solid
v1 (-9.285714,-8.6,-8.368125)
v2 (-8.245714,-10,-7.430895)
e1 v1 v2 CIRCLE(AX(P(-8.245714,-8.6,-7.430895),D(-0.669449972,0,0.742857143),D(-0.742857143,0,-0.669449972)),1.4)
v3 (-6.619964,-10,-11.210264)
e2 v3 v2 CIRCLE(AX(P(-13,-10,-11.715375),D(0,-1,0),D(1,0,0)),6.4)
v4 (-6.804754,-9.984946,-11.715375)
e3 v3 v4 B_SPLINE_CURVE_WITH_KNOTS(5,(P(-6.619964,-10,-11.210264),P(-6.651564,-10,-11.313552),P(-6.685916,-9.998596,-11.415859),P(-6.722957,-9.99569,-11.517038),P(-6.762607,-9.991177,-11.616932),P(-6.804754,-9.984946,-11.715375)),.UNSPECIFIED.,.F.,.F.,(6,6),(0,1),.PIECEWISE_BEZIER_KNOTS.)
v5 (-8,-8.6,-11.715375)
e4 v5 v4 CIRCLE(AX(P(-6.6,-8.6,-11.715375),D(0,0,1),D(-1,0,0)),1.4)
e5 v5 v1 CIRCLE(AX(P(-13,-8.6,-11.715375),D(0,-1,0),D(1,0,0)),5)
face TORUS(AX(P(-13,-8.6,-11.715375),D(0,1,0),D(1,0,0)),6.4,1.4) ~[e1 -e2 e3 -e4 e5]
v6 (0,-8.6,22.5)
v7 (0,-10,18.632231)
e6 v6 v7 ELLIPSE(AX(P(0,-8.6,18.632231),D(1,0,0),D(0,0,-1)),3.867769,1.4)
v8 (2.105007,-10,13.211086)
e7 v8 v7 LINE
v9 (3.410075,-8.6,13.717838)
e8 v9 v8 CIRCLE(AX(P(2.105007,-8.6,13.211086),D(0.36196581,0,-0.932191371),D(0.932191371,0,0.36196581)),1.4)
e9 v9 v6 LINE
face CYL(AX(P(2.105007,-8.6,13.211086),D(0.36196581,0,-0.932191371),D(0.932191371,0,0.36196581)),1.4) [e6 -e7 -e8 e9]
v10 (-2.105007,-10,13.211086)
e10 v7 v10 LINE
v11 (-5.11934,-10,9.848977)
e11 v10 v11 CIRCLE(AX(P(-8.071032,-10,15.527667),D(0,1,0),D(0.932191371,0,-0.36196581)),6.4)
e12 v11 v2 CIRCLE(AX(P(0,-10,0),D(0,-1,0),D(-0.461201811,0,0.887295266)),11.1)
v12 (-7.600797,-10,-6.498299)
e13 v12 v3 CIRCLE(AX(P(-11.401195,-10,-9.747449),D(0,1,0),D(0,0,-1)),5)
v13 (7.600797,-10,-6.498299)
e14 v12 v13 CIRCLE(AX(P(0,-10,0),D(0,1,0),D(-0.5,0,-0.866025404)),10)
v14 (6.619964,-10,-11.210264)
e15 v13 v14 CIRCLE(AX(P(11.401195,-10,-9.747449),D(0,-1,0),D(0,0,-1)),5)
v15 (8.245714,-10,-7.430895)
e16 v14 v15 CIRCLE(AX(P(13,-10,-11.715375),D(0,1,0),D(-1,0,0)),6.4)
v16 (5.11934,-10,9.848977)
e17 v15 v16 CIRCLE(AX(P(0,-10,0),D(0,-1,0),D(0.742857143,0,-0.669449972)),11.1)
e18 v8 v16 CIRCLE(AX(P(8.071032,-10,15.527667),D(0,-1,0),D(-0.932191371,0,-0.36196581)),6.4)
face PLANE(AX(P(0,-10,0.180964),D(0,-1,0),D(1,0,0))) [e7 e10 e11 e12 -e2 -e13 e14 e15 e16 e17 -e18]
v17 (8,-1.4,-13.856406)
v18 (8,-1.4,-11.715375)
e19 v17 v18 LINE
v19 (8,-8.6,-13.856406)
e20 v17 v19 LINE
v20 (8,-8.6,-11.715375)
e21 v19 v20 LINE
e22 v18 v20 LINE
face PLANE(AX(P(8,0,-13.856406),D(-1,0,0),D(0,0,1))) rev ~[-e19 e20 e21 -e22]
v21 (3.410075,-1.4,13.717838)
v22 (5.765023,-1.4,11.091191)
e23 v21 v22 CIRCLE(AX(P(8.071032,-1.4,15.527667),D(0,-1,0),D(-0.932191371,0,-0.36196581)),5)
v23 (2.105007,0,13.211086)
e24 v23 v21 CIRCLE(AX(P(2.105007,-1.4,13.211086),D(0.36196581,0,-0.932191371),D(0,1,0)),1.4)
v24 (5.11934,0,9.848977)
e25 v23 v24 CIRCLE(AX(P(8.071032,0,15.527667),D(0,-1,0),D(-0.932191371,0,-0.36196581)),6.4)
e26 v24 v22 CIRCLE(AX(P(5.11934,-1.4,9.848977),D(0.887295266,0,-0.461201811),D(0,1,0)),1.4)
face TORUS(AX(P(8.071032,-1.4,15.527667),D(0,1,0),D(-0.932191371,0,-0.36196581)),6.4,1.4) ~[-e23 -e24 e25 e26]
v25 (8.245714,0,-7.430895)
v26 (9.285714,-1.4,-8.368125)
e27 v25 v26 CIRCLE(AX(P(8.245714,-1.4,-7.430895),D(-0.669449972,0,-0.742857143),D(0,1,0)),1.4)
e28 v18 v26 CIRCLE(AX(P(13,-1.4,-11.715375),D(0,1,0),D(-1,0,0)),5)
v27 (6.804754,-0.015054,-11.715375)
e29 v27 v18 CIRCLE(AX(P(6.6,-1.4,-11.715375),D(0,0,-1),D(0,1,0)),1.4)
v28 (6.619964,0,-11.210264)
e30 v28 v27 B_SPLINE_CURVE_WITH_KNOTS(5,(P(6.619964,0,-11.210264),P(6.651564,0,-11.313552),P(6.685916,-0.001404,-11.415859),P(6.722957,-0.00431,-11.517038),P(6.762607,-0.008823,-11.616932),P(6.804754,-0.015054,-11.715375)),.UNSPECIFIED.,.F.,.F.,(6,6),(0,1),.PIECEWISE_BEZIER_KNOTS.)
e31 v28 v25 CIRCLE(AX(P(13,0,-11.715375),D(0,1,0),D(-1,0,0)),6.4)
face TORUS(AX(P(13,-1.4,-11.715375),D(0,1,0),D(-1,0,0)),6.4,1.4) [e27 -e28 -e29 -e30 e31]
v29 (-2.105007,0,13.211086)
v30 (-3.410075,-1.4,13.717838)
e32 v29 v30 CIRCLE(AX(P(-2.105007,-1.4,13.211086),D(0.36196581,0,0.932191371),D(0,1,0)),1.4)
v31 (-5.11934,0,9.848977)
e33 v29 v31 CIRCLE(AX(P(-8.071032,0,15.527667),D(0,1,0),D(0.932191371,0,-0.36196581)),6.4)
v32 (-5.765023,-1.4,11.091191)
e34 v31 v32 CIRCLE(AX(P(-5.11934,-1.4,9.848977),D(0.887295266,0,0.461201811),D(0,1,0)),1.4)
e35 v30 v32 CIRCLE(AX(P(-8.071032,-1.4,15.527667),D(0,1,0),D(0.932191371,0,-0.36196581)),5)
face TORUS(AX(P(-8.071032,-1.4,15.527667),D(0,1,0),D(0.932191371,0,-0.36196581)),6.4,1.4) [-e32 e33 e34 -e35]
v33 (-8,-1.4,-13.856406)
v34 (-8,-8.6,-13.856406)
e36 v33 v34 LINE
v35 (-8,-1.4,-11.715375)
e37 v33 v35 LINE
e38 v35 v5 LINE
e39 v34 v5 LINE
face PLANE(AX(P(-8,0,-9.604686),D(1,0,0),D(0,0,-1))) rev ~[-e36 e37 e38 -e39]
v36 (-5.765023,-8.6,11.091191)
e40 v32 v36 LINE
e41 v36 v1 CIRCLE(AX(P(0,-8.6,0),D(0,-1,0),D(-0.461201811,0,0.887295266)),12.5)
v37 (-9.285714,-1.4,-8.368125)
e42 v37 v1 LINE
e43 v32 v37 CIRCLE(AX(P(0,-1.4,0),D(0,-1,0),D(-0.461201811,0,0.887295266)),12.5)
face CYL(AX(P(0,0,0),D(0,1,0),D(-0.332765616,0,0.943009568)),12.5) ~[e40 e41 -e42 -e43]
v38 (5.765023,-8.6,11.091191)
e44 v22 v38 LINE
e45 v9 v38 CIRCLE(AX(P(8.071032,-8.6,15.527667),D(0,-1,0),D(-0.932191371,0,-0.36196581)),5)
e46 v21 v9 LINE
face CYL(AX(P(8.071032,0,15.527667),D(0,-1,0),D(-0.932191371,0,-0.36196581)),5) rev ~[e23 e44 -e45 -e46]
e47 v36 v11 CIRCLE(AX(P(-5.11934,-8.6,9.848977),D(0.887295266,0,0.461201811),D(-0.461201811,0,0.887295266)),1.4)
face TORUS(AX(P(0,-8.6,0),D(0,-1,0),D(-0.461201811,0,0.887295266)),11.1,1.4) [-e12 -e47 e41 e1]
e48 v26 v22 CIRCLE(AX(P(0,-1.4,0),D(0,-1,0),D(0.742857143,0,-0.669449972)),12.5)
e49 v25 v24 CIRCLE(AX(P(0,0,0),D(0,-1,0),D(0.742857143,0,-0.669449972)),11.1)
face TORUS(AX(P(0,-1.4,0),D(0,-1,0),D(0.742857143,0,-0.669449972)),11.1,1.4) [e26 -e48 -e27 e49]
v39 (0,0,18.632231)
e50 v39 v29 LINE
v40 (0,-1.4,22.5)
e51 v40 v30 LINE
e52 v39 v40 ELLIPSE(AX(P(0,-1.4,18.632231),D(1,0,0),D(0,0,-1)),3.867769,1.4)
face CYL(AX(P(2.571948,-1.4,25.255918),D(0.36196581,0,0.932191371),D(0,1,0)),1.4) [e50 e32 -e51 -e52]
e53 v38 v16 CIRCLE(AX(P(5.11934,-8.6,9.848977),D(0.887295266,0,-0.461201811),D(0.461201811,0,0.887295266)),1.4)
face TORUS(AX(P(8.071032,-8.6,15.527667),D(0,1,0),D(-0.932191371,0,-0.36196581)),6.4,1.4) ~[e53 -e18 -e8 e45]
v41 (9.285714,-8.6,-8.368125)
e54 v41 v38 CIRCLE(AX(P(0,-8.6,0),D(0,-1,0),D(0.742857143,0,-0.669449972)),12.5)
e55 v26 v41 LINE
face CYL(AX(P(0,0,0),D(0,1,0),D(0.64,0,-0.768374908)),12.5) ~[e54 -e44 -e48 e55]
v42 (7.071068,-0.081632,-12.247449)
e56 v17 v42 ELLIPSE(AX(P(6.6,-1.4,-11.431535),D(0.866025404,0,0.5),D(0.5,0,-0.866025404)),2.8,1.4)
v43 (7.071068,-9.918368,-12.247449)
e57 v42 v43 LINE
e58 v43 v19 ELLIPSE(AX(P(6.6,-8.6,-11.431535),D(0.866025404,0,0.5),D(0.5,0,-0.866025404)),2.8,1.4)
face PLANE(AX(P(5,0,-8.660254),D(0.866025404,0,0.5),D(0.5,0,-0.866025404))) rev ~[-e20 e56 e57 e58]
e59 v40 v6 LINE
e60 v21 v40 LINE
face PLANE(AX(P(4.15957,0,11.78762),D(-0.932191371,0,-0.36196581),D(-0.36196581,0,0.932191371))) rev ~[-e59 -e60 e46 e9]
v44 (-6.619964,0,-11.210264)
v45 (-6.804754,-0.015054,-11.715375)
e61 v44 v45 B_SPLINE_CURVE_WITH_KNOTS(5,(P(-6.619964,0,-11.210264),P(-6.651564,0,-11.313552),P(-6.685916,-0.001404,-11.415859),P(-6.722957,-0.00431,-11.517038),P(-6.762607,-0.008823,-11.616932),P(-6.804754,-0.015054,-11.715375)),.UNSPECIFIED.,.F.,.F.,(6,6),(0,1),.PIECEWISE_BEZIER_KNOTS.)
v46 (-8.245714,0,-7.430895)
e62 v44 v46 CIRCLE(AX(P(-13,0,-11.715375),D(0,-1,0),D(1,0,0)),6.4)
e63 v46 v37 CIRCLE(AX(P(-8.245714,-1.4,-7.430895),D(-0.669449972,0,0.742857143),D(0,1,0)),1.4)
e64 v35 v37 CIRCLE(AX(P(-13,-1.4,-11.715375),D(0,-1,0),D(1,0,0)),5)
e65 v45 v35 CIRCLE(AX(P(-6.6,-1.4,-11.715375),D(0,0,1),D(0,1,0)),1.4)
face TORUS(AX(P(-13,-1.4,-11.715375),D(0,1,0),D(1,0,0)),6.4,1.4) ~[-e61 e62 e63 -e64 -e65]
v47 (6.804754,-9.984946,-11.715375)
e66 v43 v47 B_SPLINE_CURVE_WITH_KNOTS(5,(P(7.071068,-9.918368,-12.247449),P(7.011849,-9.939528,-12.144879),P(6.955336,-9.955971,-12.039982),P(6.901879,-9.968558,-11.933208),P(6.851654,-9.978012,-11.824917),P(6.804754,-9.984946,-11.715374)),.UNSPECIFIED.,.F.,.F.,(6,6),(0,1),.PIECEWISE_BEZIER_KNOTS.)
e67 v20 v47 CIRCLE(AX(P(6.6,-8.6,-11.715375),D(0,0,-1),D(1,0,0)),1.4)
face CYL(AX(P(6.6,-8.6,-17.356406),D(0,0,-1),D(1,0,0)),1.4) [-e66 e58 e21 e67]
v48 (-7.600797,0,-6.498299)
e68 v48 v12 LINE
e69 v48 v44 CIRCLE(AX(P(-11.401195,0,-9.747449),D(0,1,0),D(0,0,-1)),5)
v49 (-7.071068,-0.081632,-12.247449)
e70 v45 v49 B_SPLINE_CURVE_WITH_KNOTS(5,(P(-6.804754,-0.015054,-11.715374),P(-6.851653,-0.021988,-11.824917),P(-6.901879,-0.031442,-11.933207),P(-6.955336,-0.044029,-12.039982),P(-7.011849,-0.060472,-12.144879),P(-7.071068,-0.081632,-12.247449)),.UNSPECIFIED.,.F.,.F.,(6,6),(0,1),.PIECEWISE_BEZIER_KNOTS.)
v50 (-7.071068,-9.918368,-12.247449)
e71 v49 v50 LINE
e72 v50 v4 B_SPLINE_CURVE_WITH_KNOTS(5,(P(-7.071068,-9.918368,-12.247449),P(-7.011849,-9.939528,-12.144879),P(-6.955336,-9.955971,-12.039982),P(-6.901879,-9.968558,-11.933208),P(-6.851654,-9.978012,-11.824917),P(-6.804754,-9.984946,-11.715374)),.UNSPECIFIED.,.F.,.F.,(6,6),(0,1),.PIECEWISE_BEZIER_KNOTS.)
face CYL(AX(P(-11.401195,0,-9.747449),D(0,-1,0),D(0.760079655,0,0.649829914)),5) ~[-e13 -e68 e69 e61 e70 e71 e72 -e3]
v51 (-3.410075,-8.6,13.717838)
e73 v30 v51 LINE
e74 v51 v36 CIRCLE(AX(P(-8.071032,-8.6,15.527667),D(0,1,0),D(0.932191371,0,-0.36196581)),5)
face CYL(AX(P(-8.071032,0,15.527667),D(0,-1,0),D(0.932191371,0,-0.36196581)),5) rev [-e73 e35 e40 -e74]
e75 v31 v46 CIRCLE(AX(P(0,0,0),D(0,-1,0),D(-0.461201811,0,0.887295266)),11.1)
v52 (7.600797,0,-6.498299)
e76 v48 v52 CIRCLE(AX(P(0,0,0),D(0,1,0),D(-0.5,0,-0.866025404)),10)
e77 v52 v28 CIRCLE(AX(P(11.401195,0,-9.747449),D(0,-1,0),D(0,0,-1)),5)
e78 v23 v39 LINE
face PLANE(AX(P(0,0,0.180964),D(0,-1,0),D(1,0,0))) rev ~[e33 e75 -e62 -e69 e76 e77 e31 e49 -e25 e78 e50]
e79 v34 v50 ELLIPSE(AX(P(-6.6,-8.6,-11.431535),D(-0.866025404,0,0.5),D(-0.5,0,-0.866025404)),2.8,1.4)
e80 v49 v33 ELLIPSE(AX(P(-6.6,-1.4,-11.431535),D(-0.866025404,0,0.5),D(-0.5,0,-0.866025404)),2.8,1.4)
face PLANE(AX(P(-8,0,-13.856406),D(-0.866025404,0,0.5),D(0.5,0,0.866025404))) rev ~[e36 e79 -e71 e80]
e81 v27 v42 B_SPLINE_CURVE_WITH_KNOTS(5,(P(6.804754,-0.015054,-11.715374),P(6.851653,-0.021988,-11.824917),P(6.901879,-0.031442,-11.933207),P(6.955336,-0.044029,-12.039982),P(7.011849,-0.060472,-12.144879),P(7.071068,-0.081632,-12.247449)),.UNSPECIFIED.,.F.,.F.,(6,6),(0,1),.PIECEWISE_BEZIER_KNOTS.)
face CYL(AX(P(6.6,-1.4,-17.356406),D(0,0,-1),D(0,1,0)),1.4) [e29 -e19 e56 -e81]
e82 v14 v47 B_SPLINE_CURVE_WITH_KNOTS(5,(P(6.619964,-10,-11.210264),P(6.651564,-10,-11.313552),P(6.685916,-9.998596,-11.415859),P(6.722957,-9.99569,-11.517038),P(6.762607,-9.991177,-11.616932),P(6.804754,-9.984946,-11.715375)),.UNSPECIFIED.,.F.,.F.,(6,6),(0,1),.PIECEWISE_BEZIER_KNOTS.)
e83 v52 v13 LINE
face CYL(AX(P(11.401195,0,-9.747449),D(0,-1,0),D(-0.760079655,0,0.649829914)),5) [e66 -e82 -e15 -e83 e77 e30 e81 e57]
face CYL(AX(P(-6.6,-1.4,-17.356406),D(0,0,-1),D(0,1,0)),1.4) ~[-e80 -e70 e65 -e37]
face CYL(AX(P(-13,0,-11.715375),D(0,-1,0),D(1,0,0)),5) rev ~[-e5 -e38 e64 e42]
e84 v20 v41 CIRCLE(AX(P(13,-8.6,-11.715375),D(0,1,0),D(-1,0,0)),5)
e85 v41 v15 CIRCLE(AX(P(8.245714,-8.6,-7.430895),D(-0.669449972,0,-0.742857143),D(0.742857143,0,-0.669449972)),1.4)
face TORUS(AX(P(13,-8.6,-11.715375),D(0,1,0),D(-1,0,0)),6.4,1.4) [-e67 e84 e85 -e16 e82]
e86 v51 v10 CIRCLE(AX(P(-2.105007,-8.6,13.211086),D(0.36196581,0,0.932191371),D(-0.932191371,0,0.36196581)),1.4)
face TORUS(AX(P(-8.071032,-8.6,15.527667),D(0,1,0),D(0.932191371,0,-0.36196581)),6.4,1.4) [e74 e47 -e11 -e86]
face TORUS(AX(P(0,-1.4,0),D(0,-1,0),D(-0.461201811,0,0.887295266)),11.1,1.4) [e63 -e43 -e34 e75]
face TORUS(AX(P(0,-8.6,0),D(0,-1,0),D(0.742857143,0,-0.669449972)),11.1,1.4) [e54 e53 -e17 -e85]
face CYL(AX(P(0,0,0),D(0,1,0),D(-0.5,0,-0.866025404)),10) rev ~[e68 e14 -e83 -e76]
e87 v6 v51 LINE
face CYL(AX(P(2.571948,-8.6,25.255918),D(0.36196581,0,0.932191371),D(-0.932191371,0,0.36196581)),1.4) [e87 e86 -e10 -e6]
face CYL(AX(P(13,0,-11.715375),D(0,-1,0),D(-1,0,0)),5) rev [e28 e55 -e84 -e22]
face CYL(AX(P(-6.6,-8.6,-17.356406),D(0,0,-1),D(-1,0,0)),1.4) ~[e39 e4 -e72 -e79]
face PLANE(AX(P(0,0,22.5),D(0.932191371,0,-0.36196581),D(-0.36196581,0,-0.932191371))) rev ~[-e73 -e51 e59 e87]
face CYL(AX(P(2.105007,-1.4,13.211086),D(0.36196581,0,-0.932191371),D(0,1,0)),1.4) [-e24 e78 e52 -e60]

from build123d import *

# Parameters (mm, degrees)
F1_DEPTH     = 10
F2_R         = 5
F3_R         = 5
F4_R         = 5
F5_R         = 5
F6_R         = 5
F7_T1_DEPTH  = 12.9209860369
F7_T3_DEPTH  = 12.9209860369
F7_T5_DEPTH  = 5.6410319467
F7_T8_ANGLE  = 41.3143422779
F7_T10_ANGLE = 104.5599421702
F7_T12_ANGLE = 42.0246275794
F7_T14_ANGLE = 41.3143422779
F7_T16_ANGLE = 104.5599421702
F7_T18_ANGLE = 42.0246275794
F8_T1_DEPTH  = 12.9209860369
F8_T3_DEPTH  = 12.9209860369
F8_T5_DEPTH  = 5.6410319467
F8_T8_ANGLE  = 42.0246275794
F8_T10_ANGLE = 42.0246275794
F8_T12_ANGLE = 104.5599421702
F8_T14_ANGLE = 104.5599421702
F8_T16_ANGLE = 41.3143422779
F8_T18_ANGLE = 41.3143422779


# Not quite as in the source:
# - a fillet or chamfer that OpenCascade refuses, or shapes differently, is made with other operations: its cross-section is extruded or revolved along the edge and cut away or added


with BuildPart() as f1:
    # F0 (on Front) → F1 (new body)
    with BuildSketch(Plane.XZ):
        with BuildLine():
            ThreePointArc((-5, -8.6602540378), (0, 10), (5, -8.6602540378))
            Line((5, -8.6602540378), (6.25, -10.8253175473))
            Line((6.25, -10.8253175473), (8, -13.8564064606))
            Line((8, -13.8564064606), (8, -9.6046863561))
            ThreePointArc((8, -9.6046863561), (12.3033115605, 2.2087382474), (4.1595701998, 11.7876195965))
            ThreePointArc((4.1595701998, 11.7876195965), (0, 12.5), (-4.1595701998, 11.7876195965))
            ThreePointArc((-4.1595701998, 11.7876195965), (-12.3033115605, 2.2087382474), (-8, -9.6046863561))
            Line((-8, -9.6046863561), (-8, -13.8564064606))
            Line((-8, -13.8564064606), (-6.25, -10.8253175473))
            Line((-6.25, -10.8253175473), (-5, -8.6602540378))
        make_face()
        with BuildLine():
            ThreePointArc((-4.1595701998, 11.7876195965), (0, 12.5), (4.1595701998, 11.7876195965))
            Line((4.1595701998, 11.7876195965), (0, 22.5))
            Line((0, 22.5), (-4.1595701998, 11.7876195965))
        make_face()
    extrude(amount=F1_DEPTH)

    # F2
    f2_edges = [f1.edges().sort_by_distance(p)[0] for p in [
        (-4.15957, -5, 11.78762),
    ]]
    fillet(f2_edges, radius=F2_R)

    # F3
    f3_edges = [f1.edges().sort_by_distance(p)[0] for p in [
        (4.15957, -5, 11.78762),
    ]]
    fillet(f3_edges, radius=F3_R)

    # F4
    f4_edges = [f1.edges().sort_by_distance(p)[0] for p in [
        (-5, -5, -8.660254),
    ]]
    fillet(f4_edges, radius=F4_R)

    # F5
    f5_edges = [f1.edges().sort_by_distance(p)[0] for p in [
        (-8, -5, -9.604686),
    ]]
    fillet(f5_edges, radius=F5_R)

    # F6
    f6_edges = [f1.edges().sort_by_distance(p)[0] for p in [
        (8, -5, -9.604686),
        (5, -5, -8.660254),
    ]]
    fillet(f6_edges, radius=F6_R)

    # F7: fillet of radius 1.4 on 2 edges, made by hand

    # F7_s2 → F7_t1 (cut)
    with BuildSketch(Plane(origin=(-4.1819067631, 0, 10.7699050398), x_dir=(0, 1, 0), z_dir=(-0.3619658098, 0, 0.9321913712))):
        with BuildLine():
            ThreePointArc((-8.6, -8.1442307215), (-9.5899494937, -7.7341802151), (-10, -6.7442307215))
            Line((-10, -6.7442307215), (-10, -8.1442307215))
            Line((-10, -8.1442307215), (-8.6, -8.1442307215))
        make_face()
    extrude(amount=F7_T1_DEPTH, mode=Mode.SUBTRACT)

    # F7_s4 → F7_t3 (cut)
    with BuildSketch(Plane(origin=(8.8588619379, 0, 22.8147367305), x_dir=(0, 1, 0), z_dir=(-0.3619658098, 0, -0.9321913712))):
        with BuildLine():
            ThreePointArc((-8.6, -8.1442307215), (-9.5899494937, -7.7341802151), (-10, -6.7442307215))
            Line((-10, -6.7442307215), (-10, -8.1442307215))
            Line((-10, -8.1442307215), (-8.6, -8.1442307215))
        make_face()
    extrude(amount=F7_T3_DEPTH, mode=Mode.SUBTRACT)

    # F7_s6 → F7_t5 (cut)
    with BuildSketch(Plane.XY.offset(-17.3564064606)):
        with BuildLine():
            ThreePointArc((-8, -8.6), (-7.5899494937, -9.5899494937), (-6.6, -10))
            Line((-6.6, -10), (-8, -10))
            Line((-8, -10), (-8, -8.6))
        make_face()
        with BuildLine():
            ThreePointArc((8, -8.6), (7.5899494937, -9.5899494937), (6.6, -10))
            Line((6.6, -10), (8, -10))
            Line((8, -10), (8, -8.6))
        make_face()
    extrude(amount=F7_T5_DEPTH, mode=Mode.SUBTRACT)

    # F7_s7 → F7_t8 (revolve, cut)
    with BuildSketch(Plane(origin=(4.1819067631, 0, 10.7699050398), x_dir=(0, 1, 0), z_dir=(0.3619658098, 0, 0.9321913712))):
        with BuildLine():
            ThreePointArc((-8.6, 8.1442307215), (-9.5899494937, 7.7341802151), (-10, 6.7442307215))
            Line((-10, 6.7442307215), (-10, 8.1442307215))
            Line((-10, 8.1442307215), (-8.6, 8.1442307215))
        make_face()
    revolve(axis=Axis((-8.0710316963, -10, 15.5276671576), (0, 1, 0)), revolution_arc=F7_T8_ANGLE, mode=Mode.SUBTRACT)

    # F7_s9 → F7_t10 (revolve, cut)
    with BuildSketch(Plane(origin=(0, 0, 0), x_dir=(0, 1, 0), z_dir=(0.8872952661, 0, 0.4612018112))):
        with BuildLine():
            ThreePointArc((-8.6, 12.5), (-9.5899494937, 12.0899494937), (-10, 11.1))
            Line((-10, 11.1), (-10, 12.5))
            Line((-10, 12.5), (-8.6, 12.5))
        make_face()
    revolve(axis=Axis((0, -10, 0), (0, -1, 0)), revolution_arc=F7_T10_ANGLE, mode=Mode.SUBTRACT)

    # F7_s11 → F7_t12 (revolve, cut)
    with BuildSketch(Plane.XY.offset(-11.7153745139)):
        with BuildLine():
            ThreePointArc((-8, -8.6), (-7.5899494937, -9.5899494937), (-6.6, -10))
            Line((-6.6, -10), (-8, -10))
            Line((-8, -10), (-8, -8.6))
        make_face()
    revolve(axis=Axis((-13, -10, -11.7153745139), (0, -1, 0)), revolution_arc=F7_T12_ANGLE, mode=Mode.SUBTRACT)

    # F7_s13 → F7_t14 (revolve, cut)
    with BuildSketch(Plane(origin=(-4.1819067631, 0, 10.7699050398), x_dir=(0, 1, 0), z_dir=(-0.3619658098, 0, 0.9321913712))):
        with BuildLine():
            ThreePointArc((-8.6, -8.1442307215), (-9.5899494937, -7.7341802151), (-10, -6.7442307215))
            Line((-10, -6.7442307215), (-10, -8.1442307215))
            Line((-10, -8.1442307215), (-8.6, -8.1442307215))
        make_face()
    revolve(axis=Axis((8.0710316963, -10, 15.5276671576), (0, -1, 0)), revolution_arc=F7_T14_ANGLE, mode=Mode.SUBTRACT)

    # F7_s15 → F7_t16 (revolve, cut)
    with BuildSketch(Plane(origin=(0, 0, 0), x_dir=(0, 1, 0), z_dir=(-0.6694499722, 0, -0.7428571429))):
        with BuildLine():
            ThreePointArc((-8.6, 12.5), (-9.5899494937, 12.0899494937), (-10, 11.1))
            Line((-10, 11.1), (-10, 12.5))
            Line((-10, 12.5), (-8.6, 12.5))
        make_face()
    revolve(axis=Axis((0, -10, 0), (0, -1, 0)), revolution_arc=F7_T16_ANGLE, mode=Mode.SUBTRACT)

    # F7_s17 → F7_t18 (revolve, cut)
    with BuildSketch(Plane.XY.offset(-11.7153745139)):
        with BuildLine():
            ThreePointArc((8, -8.6), (7.5899494937, -9.5899494937), (6.6, -10))
            Line((6.6, -10), (8, -10))
            Line((8, -10), (8, -8.6))
        make_face()
    revolve(axis=Axis((13, -10, -11.7153745139), (0, 1, 0)), revolution_arc=F7_T18_ANGLE, mode=Mode.SUBTRACT)

    # F8: fillet of radius 1.4 on 8 edges, made by hand

    # F8_s2 → F8_t1 (cut)
    with BuildSketch(Plane(origin=(-4.1819067631, 0, 10.7699050398), x_dir=(0, 1, 0), z_dir=(-0.3619658098, 0, 0.9321913712))):
        with BuildLine():
            ThreePointArc((0, -6.7442307215), (-0.4100505063, -7.7341802151), (-1.4, -8.1442307215))
            Line((-1.4, -8.1442307215), (0, -8.1442307215))
            Line((0, -8.1442307215), (0, -6.7442307215))
        make_face()
    extrude(amount=F8_T1_DEPTH, mode=Mode.SUBTRACT)

    # F8_s4 → F8_t3 (cut)
    with BuildSketch(Plane(origin=(8.8588619379, 0, 22.8147367305), x_dir=(0, 1, 0), z_dir=(-0.3619658098, 0, -0.9321913712))):
        with BuildLine():
            ThreePointArc((0, -6.7442307215), (-0.4100505063, -7.7341802151), (-1.4, -8.1442307215))
            Line((-1.4, -8.1442307215), (0, -8.1442307215))
            Line((0, -8.1442307215), (0, -6.7442307215))
        make_face()
    extrude(amount=F8_T3_DEPTH, mode=Mode.SUBTRACT)

    # F8_s6 → F8_t5 (cut)
    with BuildSketch(Plane.XY.offset(-17.3564064606)):
        with BuildLine():
            ThreePointArc((-6.6, 0), (-7.5899494937, -0.4100505063), (-8, -1.4))
            Line((-8, -1.4), (-8, 0))
            Line((-8, 0), (-6.6, 0))
        make_face()
        with BuildLine():
            ThreePointArc((6.6, 0), (7.5899494937, -0.4100505063), (8, -1.4))
            Line((8, -1.4), (8, 0))
            Line((8, 0), (6.6, 0))
        make_face()
    extrude(amount=F8_T5_DEPTH, mode=Mode.SUBTRACT)

    # F8_s7 → F8_t8 (revolve, cut)
    with BuildSketch(Plane.XY.offset(-11.7153745139)):
        with BuildLine():
            ThreePointArc((6.6, 0), (7.5899494937, -0.4100505063), (8, -1.4))
            Line((8, -1.4), (8, 0))
            Line((8, 0), (6.6, 0))
        make_face()
    revolve(axis=Axis((13, 0, -11.7153745139), (0, 1, 0)), revolution_arc=F8_T8_ANGLE, mode=Mode.SUBTRACT)

    # F8_s9 → F8_t10 (revolve, cut)
    with BuildSketch(Plane.XY.offset(-11.7153745139)):
        with BuildLine():
            ThreePointArc((-6.6, 0), (-7.5899494937, -0.4100505063), (-8, -1.4))
            Line((-8, -1.4), (-8, 0))
            Line((-8, 0), (-6.6, 0))
        make_face()
    revolve(axis=Axis((-13, 0, -11.7153745139), (0, -1, 0)), revolution_arc=F8_T10_ANGLE, mode=Mode.SUBTRACT)

    # F8_s11 → F8_t12 (revolve, cut)
    with BuildSketch(Plane(origin=(0, 0, 0), x_dir=(0, 1, 0), z_dir=(-0.6694499722, 0, -0.7428571429))):
        with BuildLine():
            ThreePointArc((0, 11.1), (-0.4100505063, 12.0899494937), (-1.4, 12.5))
            Line((-1.4, 12.5), (0, 12.5))
            Line((0, 12.5), (0, 11.1))
        make_face()
    revolve(axis=Axis((0, 0, 0), (0, -1, 0)), revolution_arc=F8_T12_ANGLE, mode=Mode.SUBTRACT)

    # F8_s13 → F8_t14 (revolve, cut)
    with BuildSketch(Plane(origin=(0, 0, 0), x_dir=(0, 1, 0), z_dir=(0.8872952661, 0, 0.4612018112))):
        with BuildLine():
            ThreePointArc((0, 11.1), (-0.4100505063, 12.0899494937), (-1.4, 12.5))
            Line((-1.4, 12.5), (0, 12.5))
            Line((0, 12.5), (0, 11.1))
        make_face()
    revolve(axis=Axis((0, 0, 0), (0, -1, 0)), revolution_arc=F8_T14_ANGLE, mode=Mode.SUBTRACT)

    # F8_s15 → F8_t16 (revolve, cut)
    with BuildSketch(Plane(origin=(-4.1819067631, 0, 10.7699050398), x_dir=(0, 1, 0), z_dir=(-0.3619658098, 0, 0.9321913712))):
        with BuildLine():
            ThreePointArc((0, -6.7442307215), (-0.4100505063, -7.7341802151), (-1.4, -8.1442307215))
            Line((-1.4, -8.1442307215), (0, -8.1442307215))
            Line((0, -8.1442307215), (0, -6.7442307215))
        make_face()
    revolve(axis=Axis((8.0710316963, 0, 15.5276671576), (0, -1, 0)), revolution_arc=F8_T16_ANGLE, mode=Mode.SUBTRACT)

    # F8_s17 → F8_t18 (revolve, cut)
    with BuildSketch(Plane(origin=(4.1819067631, 0, 10.7699050398), x_dir=(0, 1, 0), z_dir=(0.3619658098, 0, 0.9321913712))):
        with BuildLine():
            ThreePointArc((0, 6.7442307215), (-0.4100505063, 7.7341802151), (-1.4, 8.1442307215))
            Line((-1.4, 8.1442307215), (0, 8.1442307215))
            Line((0, 8.1442307215), (0, 6.7442307215))
        make_face()
    revolve(axis=Axis((-8.0710316963, 0, 15.5276671576), (0, 1, 0)), revolution_arc=F8_T18_ANGLE, mode=Mode.SUBTRACT)


solid = f1.part
